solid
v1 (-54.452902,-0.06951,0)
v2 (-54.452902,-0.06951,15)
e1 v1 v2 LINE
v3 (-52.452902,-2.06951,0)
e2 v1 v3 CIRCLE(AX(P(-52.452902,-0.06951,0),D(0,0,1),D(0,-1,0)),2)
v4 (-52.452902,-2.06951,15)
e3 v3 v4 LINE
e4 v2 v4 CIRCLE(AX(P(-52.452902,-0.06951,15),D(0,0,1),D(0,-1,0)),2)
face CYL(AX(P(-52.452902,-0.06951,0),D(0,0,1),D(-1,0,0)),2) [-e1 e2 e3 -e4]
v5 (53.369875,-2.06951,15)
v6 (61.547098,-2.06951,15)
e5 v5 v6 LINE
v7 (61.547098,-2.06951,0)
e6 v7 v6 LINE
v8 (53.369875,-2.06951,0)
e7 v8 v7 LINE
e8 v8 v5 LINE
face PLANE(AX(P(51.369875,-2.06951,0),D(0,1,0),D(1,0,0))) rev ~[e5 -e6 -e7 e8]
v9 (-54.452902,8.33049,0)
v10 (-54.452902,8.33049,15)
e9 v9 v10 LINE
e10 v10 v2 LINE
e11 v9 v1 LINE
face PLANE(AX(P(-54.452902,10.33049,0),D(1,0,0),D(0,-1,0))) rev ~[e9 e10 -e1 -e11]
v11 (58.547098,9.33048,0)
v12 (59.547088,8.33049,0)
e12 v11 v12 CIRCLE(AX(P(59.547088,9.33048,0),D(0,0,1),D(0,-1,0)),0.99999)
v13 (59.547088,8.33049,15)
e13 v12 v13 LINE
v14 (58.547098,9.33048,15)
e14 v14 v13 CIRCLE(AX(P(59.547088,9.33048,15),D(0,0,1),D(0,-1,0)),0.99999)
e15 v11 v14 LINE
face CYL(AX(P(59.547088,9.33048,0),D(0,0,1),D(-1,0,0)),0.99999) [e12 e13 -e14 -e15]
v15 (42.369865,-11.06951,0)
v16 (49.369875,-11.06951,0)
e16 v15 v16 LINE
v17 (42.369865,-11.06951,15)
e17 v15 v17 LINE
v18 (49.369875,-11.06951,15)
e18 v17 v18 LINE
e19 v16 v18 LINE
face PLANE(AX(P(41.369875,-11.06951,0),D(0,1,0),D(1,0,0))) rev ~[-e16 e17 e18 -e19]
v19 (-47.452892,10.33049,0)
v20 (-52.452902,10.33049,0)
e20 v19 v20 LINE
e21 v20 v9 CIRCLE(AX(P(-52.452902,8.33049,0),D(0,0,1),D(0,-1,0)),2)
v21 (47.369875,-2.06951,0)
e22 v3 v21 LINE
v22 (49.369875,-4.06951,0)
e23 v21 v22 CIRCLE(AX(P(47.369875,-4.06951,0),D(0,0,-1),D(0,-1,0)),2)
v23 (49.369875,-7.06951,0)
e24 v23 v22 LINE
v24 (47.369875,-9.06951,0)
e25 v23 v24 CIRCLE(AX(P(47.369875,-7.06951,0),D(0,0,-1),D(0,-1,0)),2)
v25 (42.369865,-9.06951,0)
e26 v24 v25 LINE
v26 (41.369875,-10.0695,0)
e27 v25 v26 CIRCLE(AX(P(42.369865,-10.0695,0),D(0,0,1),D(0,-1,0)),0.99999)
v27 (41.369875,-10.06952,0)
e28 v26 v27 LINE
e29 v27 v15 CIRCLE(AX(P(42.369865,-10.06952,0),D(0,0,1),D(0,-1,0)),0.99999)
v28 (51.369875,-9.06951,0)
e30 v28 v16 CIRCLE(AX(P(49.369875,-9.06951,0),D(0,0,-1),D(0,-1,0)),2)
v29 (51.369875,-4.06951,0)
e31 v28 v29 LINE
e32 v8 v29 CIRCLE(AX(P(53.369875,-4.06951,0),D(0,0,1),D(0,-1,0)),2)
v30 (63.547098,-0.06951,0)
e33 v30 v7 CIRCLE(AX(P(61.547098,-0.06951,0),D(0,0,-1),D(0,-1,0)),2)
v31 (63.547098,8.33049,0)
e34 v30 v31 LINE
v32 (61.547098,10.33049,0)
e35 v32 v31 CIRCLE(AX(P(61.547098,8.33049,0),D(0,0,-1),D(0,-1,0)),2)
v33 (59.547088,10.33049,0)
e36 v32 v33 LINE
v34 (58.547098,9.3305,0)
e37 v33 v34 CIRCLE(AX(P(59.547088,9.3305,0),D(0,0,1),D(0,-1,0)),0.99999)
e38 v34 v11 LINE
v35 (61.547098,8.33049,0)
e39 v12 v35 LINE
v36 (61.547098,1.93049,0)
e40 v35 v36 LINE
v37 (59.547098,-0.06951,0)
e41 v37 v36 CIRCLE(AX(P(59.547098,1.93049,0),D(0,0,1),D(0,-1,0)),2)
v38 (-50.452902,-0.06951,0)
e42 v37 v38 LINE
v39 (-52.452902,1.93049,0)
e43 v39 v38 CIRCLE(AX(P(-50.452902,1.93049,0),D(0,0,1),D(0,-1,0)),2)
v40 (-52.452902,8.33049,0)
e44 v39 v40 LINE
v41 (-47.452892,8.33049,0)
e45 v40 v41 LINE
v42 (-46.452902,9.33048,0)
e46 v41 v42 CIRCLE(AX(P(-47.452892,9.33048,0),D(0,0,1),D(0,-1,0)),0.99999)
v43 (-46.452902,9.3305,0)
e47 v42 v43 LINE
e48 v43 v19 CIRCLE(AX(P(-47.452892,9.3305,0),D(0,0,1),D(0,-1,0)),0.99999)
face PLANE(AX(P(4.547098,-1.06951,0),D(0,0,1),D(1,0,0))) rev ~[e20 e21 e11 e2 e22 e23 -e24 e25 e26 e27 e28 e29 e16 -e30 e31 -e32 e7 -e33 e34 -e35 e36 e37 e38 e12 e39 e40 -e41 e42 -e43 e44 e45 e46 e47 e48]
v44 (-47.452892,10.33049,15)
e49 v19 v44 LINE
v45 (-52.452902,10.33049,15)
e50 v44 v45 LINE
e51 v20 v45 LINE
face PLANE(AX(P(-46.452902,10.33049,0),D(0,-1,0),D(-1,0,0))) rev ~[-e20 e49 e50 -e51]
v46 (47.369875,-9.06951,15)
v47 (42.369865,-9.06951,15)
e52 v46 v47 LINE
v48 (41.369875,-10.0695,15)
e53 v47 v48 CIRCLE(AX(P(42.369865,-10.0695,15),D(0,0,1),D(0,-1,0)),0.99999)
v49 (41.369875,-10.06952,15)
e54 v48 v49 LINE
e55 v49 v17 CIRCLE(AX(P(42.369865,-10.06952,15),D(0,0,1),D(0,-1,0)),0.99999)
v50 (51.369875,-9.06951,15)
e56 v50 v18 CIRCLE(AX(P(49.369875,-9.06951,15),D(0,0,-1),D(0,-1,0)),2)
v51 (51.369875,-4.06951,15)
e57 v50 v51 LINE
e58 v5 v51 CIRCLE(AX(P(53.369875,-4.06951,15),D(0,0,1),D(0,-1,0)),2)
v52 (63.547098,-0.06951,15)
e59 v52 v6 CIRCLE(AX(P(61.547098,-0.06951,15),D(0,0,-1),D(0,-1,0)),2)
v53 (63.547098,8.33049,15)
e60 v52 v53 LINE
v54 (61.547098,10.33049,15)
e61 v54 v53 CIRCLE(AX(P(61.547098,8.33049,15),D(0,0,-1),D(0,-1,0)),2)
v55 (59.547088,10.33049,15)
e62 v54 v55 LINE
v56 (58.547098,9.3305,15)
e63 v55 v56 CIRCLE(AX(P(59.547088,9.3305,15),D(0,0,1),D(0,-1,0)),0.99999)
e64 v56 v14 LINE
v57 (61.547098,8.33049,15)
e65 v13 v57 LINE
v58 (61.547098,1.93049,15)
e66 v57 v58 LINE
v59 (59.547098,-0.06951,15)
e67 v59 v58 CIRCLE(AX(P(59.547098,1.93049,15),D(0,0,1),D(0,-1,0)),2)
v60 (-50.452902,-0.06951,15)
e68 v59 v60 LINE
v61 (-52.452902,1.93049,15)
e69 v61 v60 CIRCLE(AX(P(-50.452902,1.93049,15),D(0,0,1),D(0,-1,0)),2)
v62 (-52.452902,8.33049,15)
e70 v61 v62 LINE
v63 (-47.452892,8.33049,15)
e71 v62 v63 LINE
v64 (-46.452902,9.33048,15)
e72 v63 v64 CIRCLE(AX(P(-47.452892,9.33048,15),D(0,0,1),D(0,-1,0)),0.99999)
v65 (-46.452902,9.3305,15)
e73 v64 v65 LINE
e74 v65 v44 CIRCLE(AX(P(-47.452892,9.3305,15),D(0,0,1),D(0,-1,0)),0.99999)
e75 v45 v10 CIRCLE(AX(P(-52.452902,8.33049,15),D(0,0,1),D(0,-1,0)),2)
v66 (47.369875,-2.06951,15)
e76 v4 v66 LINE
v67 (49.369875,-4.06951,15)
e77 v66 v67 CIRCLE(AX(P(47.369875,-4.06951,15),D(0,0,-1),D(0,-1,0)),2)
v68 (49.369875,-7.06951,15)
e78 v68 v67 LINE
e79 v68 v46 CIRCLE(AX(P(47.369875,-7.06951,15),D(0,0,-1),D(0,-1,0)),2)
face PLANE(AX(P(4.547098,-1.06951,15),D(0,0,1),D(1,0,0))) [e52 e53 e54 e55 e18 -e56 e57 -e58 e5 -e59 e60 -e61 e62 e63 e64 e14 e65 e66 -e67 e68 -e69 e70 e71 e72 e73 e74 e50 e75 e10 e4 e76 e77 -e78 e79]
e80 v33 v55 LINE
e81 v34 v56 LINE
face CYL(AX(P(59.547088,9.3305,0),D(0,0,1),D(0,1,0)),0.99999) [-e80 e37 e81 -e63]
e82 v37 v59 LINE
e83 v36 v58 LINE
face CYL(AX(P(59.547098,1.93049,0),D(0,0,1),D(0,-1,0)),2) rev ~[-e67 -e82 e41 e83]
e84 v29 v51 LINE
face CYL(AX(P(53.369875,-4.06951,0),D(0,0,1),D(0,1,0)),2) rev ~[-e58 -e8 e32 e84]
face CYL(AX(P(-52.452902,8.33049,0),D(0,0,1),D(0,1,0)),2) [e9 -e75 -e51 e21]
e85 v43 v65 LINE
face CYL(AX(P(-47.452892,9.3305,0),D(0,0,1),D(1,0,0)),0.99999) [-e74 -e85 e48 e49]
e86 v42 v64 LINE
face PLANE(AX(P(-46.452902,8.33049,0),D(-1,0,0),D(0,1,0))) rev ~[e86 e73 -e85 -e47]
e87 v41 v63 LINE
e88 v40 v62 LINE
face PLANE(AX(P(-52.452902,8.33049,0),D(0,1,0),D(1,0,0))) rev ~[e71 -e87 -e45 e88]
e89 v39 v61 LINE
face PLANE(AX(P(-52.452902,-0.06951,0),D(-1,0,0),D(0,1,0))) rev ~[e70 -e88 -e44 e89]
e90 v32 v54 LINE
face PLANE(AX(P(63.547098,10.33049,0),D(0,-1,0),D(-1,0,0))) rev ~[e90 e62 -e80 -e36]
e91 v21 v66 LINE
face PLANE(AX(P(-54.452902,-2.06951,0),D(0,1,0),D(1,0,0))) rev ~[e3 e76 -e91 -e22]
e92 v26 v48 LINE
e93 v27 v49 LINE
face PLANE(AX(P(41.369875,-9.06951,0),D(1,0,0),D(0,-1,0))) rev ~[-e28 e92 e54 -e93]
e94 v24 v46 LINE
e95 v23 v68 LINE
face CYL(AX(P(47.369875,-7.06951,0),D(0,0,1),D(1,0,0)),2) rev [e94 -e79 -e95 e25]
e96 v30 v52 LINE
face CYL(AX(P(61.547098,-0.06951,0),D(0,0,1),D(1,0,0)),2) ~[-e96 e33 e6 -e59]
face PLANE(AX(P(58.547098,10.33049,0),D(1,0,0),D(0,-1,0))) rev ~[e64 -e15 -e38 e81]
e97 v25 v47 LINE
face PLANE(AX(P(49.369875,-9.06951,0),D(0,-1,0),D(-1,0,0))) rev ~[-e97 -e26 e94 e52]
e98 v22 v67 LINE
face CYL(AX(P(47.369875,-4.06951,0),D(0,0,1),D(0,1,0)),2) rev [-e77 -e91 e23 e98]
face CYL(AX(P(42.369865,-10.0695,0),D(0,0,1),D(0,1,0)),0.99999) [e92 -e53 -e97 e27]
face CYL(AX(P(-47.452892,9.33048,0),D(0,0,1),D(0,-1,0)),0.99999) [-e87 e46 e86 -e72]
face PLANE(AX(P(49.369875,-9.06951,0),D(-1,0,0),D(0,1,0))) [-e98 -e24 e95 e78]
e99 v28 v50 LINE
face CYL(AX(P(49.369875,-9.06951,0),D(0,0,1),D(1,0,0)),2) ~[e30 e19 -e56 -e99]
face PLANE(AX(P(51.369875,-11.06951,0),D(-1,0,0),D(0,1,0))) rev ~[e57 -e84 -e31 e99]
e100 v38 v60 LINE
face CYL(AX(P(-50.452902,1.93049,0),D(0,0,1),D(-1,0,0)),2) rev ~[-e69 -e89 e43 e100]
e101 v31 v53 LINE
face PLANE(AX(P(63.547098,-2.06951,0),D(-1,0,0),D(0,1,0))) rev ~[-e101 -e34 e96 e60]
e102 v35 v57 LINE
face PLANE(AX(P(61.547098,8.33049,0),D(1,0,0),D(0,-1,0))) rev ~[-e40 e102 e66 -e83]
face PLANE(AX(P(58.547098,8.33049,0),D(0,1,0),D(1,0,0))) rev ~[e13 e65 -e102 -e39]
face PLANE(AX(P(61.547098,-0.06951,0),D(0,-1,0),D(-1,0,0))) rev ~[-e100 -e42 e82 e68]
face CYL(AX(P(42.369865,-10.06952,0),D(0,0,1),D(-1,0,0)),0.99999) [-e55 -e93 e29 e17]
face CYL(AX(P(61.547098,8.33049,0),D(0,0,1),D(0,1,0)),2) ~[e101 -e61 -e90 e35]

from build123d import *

# Parameters (mm, degrees)
F0_W     = 2
F0_H     = 7
F1_DEPTH = 15
F2_R     = 0.99999
F3_R     = 2


# Not quite as in the source:
# - a fillet or chamfer is up to 0.001 mm smaller than in the source, because OpenCascade refuses the exact size


with BuildPart() as f1:
    # F0 (on Top) → F1 (new body)
    with BuildSketch(Plane.XY):
        Polygon((61.5470979531, -0.0695097194), (-52.4529020469, -0.0695097194), (-52.4529020469, -2.0695097194), (49.3698753417, -2.0695097194), (51.3698753417, -2.0695097194), (61.5470979531, -2.0695097194), align=None)
        Polygon((-52.4529020469, -2.0695097194), (-52.4529020469, -0.0695097194), (-52.4529020469, 8.3304902806), (-54.4529020469, 8.3304902806), (-54.4529020469, -2.0695097194), align=None)
        Polygon((61.5470979531, 8.3304902806), (61.5470979531, -0.0695097194), (61.5470979531, -2.0695097194), (63.5470979531, -2.0695097194), (63.5470979531, 8.3304902806), align=None)
        Polygon((-54.4529020469, 8.3304902806), (-52.4529020469, 8.3304902806), (-46.4529020469, 8.3304902806), (-46.4529020469, 10.3304902806), (-54.4529020469, 10.3304902806), align=None)
        Polygon((58.5470979531, 8.3304902806), (61.5470979531, 8.3304902806), (63.5470979531, 8.3304902806), (63.5470979531, 10.3304902806), (58.5470979531, 10.3304902806), align=None)
        with Locations((50.3698753417, -5.5695097194)):
            Rectangle(F0_W, F0_H)
        Polygon((51.3698753417, -9.0695097194), (49.3698753417, -9.0695097194), (41.3698753417, -9.0695097194), (41.3698753417, -11.0695097194), (51.3698753417, -11.0695097194), align=None)
    extrude(amount=F1_DEPTH)

    # F2 (radius 1 in the source; OpenCascade refuses exactly that, so slightly less here)
    f2_edges = [f1.edges().sort_by_distance(p)[0] for p in [
        (58.547098, 10.33049, 7.5),
        (58.547098, 8.33049, 7.5),
        (-46.452902, 8.33049, 7.5),
        (-46.452902, 10.33049, 7.5),
        (41.369875, -9.06951, 7.5),
        (41.369875, -11.06951, 7.5),
    ]]
    fillet(f2_edges, radius=F2_R)

    # F3
    f3_edges = [f1.edges().sort_by_distance(p)[0] for p in [
        (-54.452902, 10.33049, 7.5),
        (-54.452902, -2.06951, 7.5),
        (63.547098, -2.06951, 7.5),
        (63.547098, 10.33049, 7.5),
        (51.369875, -11.06951, 7.5),
        (49.369875, -2.06951, 7.5),
        (51.369875, -2.06951, 7.5),
        (49.369875, -9.06951, 7.5),
        (-52.452902, -0.06951, 7.5),
        (61.547098, -0.06951, 7.5),
    ]]
    fillet(f3_edges, radius=F3_R)


solid = f1.part
